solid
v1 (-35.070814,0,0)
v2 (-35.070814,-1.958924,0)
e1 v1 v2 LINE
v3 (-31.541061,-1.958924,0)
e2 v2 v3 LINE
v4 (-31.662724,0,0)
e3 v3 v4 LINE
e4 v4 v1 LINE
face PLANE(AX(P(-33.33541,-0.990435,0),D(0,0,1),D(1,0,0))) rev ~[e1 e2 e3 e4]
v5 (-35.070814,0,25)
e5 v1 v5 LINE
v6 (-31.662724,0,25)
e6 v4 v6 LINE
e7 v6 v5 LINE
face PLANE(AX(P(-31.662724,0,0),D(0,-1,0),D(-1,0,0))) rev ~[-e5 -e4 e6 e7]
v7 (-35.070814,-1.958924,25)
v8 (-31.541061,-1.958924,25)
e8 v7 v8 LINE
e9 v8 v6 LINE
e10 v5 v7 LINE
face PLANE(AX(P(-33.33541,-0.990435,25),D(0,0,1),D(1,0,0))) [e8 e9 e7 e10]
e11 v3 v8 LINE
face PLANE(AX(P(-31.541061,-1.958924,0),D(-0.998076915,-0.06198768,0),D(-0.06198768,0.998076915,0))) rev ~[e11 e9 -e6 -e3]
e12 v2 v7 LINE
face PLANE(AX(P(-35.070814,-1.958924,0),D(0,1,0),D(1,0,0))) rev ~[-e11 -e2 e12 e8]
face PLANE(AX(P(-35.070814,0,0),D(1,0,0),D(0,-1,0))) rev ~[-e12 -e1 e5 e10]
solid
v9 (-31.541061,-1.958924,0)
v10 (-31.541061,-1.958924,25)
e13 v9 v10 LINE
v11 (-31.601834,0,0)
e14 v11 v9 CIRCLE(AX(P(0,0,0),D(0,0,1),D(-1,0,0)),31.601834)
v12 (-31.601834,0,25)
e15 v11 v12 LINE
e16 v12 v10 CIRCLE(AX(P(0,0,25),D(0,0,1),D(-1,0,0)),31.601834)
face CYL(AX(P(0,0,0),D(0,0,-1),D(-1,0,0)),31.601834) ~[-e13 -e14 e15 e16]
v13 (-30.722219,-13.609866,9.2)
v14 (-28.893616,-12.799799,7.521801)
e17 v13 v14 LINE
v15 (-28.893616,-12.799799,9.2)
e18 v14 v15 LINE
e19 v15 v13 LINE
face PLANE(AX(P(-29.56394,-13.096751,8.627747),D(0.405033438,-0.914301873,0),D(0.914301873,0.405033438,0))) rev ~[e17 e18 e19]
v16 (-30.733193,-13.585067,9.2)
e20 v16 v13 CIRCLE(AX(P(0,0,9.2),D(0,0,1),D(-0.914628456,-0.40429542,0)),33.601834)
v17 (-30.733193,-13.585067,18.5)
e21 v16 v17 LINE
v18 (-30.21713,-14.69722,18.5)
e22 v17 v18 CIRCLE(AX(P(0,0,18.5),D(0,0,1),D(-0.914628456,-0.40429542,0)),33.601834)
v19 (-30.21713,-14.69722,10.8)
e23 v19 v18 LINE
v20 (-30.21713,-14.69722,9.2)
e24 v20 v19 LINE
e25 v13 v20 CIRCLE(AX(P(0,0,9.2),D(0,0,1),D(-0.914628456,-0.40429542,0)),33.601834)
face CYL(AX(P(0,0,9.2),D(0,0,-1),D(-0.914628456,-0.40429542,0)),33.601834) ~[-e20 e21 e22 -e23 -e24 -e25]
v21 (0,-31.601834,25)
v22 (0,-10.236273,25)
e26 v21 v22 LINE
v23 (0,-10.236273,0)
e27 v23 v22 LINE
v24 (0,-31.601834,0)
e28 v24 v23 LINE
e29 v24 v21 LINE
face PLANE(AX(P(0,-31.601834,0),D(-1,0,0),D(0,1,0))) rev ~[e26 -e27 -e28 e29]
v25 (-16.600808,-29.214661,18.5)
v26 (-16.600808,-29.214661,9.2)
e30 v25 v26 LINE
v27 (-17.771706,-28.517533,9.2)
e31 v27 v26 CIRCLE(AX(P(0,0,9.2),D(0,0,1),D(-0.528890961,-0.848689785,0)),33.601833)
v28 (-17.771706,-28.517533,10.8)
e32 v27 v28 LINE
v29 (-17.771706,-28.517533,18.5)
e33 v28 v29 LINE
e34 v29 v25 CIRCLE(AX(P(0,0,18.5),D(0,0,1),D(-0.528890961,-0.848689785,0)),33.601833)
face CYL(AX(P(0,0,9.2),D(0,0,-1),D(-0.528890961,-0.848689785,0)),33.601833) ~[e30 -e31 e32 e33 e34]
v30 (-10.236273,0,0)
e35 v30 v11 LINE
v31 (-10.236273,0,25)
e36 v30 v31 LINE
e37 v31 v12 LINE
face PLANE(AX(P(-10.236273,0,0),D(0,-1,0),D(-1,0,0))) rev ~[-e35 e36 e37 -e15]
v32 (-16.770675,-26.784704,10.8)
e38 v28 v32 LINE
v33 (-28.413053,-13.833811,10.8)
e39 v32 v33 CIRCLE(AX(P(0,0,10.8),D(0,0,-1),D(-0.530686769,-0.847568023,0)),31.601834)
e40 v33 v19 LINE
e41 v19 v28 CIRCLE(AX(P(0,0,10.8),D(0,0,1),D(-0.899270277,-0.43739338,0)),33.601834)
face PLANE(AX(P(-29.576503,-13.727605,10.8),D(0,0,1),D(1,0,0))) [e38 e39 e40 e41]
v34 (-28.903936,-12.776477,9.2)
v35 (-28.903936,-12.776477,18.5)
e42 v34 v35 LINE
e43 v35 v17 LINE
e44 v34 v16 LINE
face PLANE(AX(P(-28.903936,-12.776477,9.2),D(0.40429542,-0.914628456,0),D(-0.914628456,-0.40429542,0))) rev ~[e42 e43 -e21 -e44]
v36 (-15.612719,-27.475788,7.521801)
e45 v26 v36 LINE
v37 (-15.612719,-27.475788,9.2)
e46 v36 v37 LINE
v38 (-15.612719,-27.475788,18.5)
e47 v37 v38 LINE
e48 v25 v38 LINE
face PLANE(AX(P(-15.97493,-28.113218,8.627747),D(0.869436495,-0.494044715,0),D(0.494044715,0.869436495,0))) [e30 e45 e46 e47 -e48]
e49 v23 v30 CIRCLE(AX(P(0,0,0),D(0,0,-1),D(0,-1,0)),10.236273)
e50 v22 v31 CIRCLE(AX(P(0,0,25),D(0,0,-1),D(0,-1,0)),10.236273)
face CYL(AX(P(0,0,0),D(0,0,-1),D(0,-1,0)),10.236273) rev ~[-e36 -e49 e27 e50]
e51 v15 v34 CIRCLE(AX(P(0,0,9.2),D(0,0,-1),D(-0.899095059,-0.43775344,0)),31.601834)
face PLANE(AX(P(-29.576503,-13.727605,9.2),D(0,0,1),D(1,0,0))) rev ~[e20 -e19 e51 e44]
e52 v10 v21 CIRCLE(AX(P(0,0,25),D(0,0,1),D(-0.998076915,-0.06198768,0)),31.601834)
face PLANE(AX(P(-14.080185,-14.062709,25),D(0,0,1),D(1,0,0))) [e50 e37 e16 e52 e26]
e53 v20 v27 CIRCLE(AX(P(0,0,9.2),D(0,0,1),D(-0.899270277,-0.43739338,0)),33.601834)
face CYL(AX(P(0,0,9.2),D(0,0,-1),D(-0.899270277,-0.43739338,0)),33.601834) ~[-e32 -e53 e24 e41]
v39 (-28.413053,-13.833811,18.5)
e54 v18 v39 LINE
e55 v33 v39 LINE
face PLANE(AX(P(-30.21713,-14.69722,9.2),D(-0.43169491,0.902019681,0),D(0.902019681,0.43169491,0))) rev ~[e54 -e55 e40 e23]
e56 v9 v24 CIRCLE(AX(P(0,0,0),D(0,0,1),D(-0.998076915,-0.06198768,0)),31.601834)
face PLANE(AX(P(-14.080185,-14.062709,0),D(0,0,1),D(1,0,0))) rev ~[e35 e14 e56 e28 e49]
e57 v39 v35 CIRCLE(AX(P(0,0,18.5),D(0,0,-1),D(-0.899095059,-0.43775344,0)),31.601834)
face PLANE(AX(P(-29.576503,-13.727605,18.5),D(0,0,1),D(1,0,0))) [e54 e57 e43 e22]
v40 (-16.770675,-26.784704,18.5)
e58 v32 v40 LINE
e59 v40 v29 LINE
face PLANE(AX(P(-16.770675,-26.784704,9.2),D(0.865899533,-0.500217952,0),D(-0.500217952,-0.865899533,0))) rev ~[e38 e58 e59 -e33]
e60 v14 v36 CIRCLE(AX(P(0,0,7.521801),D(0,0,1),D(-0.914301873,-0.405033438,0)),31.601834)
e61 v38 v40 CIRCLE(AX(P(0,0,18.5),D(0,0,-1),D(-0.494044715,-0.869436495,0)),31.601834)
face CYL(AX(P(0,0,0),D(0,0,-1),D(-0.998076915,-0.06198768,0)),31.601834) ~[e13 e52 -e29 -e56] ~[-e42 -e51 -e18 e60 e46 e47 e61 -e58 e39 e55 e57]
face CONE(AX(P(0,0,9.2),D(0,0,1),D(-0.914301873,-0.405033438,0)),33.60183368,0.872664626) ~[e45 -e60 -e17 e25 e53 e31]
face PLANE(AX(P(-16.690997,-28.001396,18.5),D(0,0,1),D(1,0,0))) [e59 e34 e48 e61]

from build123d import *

# Parameters (mm, degrees)
F1_DEPTH       = 25
F4_DEPTH       = 1.6
F5_DEPTH       = 9.3
F8_ANGLE_START = 323.5
F8_ANGLE       = 36.5


# Not quite as in the source:
# - a feature names something its author has since deleted; it is built from what else it names


with BuildPart() as f1:
    # F0 (on Top) → F1 (new body)
    with BuildSketch(Plane.XY):
        Polygon((-31.6627237999, 0), (-35.0708141923, 0), (-35.0708141923, -1.9589243457), (-31.5410606563, -1.9589243457), align=None)
    extrude(amount=F1_DEPTH)


with BuildPart() as f1b:
    # F0 (on Top) → F1, piece 2 (new body)
    with BuildSketch(Plane.XY):
        with BuildLine():
            Line((-10.2362729305, 0), (-31.6018336797, 0))
            ThreePointArc((-31.6018336797, 0), (-31.5866367698, -0.97993341), (-31.5410606563, -1.9589243457))
            ThreePointArc((-31.5410606563, -1.9589243457), (-21.6422074955, -23.0280426142), (0, -31.6018336797))
            Line((0, -31.6018336797), (0, -10.2362729305))
            ThreePointArc((0, -10.2362729305), (-7.2381380033, -7.2381380033), (-10.2362729305, 0))
        make_face()
    extrude(amount=F1_DEPTH)

    # F3 (on offset) → F4 (join)
    with BuildSketch(Plane.XY.offset(9.2)):
        with BuildLine():
            Line((-28.9039363578, -12.7764766248), (-30.7331932706, -13.5850674651))
            ThreePointArc((-30.7331932706, -13.5850674651), (-30.4802346772, -14.1434974691), (-30.2171302851, -14.6972196))
            Line((-30.2171302851, -14.6972196), (-28.4130525281, -13.8338114038))
            ThreePointArc((-28.4130525281, -13.8338114038), (-28.66337023, -13.307407673), (-28.9039363578, -12.7764766248))
        make_face()
        with BuildLine():
            Line((-28.4130525281, -13.8338114038), (-30.2171302851, -14.6972196))
            ThreePointArc((-30.2171302851, -14.6972196), (-24.9696289489, -22.4855699681), (-17.771706088, -28.5175330167))
            Line((-17.771706088, -28.5175330167), (-16.7706750146, -26.7847036846))
            ThreePointArc((-16.7706750146, -26.7847036846), (-23.5015682749, -21.1270485524), (-28.4130525281, -13.8338114038))
        make_face()
        with BuildLine():
            Line((-16.7706750146, -26.7847036846), (-17.771706088, -28.5175330167))
            ThreePointArc((-17.771706088, -28.5175330167), (-17.1897915571, -28.8720330573), (-16.6008083436, -29.2146605144))
            Line((-16.6008083436, -29.2146605144), (-15.6127189136, -27.4757875236))
            ThreePointArc((-15.6127189136, -27.4757875236), (-16.1953835952, -27.1364227952), (-16.7706750146, -26.7847036846))
        make_face()
    extrude(amount=F4_DEPTH)

    # F3 (on offset) → F5 (join)
    with BuildSketch(Plane.XY.offset(9.2)):
        with BuildLine():
            Line((-16.7706750146, -26.7847036846), (-17.771706088, -28.5175330167))
            ThreePointArc((-17.771706088, -28.5175330167), (-17.1897915571, -28.8720330573), (-16.6008083436, -29.2146605144))
            Line((-16.6008083436, -29.2146605144), (-15.6127189136, -27.4757875236))
            ThreePointArc((-15.6127189136, -27.4757875236), (-16.1953835952, -27.1364227952), (-16.7706750146, -26.7847036846))
        make_face()
        with BuildLine():
            Line((-28.9039363578, -12.7764766248), (-30.7331932706, -13.5850674651))
            ThreePointArc((-30.7331932706, -13.5850674651), (-30.4802346772, -14.1434974691), (-30.2171302851, -14.6972196))
            Line((-30.2171302851, -14.6972196), (-28.4130525281, -13.8338114038))
            ThreePointArc((-28.4130525281, -13.8338114038), (-28.66337023, -13.307407673), (-28.9039363578, -12.7764766248))
        make_face()
    extrude(amount=F5_DEPTH)

    # F6 (on face) → F8 (revolve)
    with BuildSketch(Plane(origin=(0, 0, 0), x_dir=(0.494044715, 0.8694364954, 0), z_dir=(0.8694364954, -0.494044715, 0)), mode=Mode.PRIVATE) as f8_sk:
        Polygon((-31.6018336797, 9.2), (-33.6018336797, 9.2), (-31.6018336797, 7.5218007376), align=None)
    revolve(f8_sk.sketch.rotate(Axis((0, 0, 29.4944159687), (0, 0, 1)), F8_ANGLE_START), axis=Axis((0, 0, 29.4944159687), (0, 0, 1)), revolution_arc=F8_ANGLE)


solid = Compound([f1.part, f1b.part])
